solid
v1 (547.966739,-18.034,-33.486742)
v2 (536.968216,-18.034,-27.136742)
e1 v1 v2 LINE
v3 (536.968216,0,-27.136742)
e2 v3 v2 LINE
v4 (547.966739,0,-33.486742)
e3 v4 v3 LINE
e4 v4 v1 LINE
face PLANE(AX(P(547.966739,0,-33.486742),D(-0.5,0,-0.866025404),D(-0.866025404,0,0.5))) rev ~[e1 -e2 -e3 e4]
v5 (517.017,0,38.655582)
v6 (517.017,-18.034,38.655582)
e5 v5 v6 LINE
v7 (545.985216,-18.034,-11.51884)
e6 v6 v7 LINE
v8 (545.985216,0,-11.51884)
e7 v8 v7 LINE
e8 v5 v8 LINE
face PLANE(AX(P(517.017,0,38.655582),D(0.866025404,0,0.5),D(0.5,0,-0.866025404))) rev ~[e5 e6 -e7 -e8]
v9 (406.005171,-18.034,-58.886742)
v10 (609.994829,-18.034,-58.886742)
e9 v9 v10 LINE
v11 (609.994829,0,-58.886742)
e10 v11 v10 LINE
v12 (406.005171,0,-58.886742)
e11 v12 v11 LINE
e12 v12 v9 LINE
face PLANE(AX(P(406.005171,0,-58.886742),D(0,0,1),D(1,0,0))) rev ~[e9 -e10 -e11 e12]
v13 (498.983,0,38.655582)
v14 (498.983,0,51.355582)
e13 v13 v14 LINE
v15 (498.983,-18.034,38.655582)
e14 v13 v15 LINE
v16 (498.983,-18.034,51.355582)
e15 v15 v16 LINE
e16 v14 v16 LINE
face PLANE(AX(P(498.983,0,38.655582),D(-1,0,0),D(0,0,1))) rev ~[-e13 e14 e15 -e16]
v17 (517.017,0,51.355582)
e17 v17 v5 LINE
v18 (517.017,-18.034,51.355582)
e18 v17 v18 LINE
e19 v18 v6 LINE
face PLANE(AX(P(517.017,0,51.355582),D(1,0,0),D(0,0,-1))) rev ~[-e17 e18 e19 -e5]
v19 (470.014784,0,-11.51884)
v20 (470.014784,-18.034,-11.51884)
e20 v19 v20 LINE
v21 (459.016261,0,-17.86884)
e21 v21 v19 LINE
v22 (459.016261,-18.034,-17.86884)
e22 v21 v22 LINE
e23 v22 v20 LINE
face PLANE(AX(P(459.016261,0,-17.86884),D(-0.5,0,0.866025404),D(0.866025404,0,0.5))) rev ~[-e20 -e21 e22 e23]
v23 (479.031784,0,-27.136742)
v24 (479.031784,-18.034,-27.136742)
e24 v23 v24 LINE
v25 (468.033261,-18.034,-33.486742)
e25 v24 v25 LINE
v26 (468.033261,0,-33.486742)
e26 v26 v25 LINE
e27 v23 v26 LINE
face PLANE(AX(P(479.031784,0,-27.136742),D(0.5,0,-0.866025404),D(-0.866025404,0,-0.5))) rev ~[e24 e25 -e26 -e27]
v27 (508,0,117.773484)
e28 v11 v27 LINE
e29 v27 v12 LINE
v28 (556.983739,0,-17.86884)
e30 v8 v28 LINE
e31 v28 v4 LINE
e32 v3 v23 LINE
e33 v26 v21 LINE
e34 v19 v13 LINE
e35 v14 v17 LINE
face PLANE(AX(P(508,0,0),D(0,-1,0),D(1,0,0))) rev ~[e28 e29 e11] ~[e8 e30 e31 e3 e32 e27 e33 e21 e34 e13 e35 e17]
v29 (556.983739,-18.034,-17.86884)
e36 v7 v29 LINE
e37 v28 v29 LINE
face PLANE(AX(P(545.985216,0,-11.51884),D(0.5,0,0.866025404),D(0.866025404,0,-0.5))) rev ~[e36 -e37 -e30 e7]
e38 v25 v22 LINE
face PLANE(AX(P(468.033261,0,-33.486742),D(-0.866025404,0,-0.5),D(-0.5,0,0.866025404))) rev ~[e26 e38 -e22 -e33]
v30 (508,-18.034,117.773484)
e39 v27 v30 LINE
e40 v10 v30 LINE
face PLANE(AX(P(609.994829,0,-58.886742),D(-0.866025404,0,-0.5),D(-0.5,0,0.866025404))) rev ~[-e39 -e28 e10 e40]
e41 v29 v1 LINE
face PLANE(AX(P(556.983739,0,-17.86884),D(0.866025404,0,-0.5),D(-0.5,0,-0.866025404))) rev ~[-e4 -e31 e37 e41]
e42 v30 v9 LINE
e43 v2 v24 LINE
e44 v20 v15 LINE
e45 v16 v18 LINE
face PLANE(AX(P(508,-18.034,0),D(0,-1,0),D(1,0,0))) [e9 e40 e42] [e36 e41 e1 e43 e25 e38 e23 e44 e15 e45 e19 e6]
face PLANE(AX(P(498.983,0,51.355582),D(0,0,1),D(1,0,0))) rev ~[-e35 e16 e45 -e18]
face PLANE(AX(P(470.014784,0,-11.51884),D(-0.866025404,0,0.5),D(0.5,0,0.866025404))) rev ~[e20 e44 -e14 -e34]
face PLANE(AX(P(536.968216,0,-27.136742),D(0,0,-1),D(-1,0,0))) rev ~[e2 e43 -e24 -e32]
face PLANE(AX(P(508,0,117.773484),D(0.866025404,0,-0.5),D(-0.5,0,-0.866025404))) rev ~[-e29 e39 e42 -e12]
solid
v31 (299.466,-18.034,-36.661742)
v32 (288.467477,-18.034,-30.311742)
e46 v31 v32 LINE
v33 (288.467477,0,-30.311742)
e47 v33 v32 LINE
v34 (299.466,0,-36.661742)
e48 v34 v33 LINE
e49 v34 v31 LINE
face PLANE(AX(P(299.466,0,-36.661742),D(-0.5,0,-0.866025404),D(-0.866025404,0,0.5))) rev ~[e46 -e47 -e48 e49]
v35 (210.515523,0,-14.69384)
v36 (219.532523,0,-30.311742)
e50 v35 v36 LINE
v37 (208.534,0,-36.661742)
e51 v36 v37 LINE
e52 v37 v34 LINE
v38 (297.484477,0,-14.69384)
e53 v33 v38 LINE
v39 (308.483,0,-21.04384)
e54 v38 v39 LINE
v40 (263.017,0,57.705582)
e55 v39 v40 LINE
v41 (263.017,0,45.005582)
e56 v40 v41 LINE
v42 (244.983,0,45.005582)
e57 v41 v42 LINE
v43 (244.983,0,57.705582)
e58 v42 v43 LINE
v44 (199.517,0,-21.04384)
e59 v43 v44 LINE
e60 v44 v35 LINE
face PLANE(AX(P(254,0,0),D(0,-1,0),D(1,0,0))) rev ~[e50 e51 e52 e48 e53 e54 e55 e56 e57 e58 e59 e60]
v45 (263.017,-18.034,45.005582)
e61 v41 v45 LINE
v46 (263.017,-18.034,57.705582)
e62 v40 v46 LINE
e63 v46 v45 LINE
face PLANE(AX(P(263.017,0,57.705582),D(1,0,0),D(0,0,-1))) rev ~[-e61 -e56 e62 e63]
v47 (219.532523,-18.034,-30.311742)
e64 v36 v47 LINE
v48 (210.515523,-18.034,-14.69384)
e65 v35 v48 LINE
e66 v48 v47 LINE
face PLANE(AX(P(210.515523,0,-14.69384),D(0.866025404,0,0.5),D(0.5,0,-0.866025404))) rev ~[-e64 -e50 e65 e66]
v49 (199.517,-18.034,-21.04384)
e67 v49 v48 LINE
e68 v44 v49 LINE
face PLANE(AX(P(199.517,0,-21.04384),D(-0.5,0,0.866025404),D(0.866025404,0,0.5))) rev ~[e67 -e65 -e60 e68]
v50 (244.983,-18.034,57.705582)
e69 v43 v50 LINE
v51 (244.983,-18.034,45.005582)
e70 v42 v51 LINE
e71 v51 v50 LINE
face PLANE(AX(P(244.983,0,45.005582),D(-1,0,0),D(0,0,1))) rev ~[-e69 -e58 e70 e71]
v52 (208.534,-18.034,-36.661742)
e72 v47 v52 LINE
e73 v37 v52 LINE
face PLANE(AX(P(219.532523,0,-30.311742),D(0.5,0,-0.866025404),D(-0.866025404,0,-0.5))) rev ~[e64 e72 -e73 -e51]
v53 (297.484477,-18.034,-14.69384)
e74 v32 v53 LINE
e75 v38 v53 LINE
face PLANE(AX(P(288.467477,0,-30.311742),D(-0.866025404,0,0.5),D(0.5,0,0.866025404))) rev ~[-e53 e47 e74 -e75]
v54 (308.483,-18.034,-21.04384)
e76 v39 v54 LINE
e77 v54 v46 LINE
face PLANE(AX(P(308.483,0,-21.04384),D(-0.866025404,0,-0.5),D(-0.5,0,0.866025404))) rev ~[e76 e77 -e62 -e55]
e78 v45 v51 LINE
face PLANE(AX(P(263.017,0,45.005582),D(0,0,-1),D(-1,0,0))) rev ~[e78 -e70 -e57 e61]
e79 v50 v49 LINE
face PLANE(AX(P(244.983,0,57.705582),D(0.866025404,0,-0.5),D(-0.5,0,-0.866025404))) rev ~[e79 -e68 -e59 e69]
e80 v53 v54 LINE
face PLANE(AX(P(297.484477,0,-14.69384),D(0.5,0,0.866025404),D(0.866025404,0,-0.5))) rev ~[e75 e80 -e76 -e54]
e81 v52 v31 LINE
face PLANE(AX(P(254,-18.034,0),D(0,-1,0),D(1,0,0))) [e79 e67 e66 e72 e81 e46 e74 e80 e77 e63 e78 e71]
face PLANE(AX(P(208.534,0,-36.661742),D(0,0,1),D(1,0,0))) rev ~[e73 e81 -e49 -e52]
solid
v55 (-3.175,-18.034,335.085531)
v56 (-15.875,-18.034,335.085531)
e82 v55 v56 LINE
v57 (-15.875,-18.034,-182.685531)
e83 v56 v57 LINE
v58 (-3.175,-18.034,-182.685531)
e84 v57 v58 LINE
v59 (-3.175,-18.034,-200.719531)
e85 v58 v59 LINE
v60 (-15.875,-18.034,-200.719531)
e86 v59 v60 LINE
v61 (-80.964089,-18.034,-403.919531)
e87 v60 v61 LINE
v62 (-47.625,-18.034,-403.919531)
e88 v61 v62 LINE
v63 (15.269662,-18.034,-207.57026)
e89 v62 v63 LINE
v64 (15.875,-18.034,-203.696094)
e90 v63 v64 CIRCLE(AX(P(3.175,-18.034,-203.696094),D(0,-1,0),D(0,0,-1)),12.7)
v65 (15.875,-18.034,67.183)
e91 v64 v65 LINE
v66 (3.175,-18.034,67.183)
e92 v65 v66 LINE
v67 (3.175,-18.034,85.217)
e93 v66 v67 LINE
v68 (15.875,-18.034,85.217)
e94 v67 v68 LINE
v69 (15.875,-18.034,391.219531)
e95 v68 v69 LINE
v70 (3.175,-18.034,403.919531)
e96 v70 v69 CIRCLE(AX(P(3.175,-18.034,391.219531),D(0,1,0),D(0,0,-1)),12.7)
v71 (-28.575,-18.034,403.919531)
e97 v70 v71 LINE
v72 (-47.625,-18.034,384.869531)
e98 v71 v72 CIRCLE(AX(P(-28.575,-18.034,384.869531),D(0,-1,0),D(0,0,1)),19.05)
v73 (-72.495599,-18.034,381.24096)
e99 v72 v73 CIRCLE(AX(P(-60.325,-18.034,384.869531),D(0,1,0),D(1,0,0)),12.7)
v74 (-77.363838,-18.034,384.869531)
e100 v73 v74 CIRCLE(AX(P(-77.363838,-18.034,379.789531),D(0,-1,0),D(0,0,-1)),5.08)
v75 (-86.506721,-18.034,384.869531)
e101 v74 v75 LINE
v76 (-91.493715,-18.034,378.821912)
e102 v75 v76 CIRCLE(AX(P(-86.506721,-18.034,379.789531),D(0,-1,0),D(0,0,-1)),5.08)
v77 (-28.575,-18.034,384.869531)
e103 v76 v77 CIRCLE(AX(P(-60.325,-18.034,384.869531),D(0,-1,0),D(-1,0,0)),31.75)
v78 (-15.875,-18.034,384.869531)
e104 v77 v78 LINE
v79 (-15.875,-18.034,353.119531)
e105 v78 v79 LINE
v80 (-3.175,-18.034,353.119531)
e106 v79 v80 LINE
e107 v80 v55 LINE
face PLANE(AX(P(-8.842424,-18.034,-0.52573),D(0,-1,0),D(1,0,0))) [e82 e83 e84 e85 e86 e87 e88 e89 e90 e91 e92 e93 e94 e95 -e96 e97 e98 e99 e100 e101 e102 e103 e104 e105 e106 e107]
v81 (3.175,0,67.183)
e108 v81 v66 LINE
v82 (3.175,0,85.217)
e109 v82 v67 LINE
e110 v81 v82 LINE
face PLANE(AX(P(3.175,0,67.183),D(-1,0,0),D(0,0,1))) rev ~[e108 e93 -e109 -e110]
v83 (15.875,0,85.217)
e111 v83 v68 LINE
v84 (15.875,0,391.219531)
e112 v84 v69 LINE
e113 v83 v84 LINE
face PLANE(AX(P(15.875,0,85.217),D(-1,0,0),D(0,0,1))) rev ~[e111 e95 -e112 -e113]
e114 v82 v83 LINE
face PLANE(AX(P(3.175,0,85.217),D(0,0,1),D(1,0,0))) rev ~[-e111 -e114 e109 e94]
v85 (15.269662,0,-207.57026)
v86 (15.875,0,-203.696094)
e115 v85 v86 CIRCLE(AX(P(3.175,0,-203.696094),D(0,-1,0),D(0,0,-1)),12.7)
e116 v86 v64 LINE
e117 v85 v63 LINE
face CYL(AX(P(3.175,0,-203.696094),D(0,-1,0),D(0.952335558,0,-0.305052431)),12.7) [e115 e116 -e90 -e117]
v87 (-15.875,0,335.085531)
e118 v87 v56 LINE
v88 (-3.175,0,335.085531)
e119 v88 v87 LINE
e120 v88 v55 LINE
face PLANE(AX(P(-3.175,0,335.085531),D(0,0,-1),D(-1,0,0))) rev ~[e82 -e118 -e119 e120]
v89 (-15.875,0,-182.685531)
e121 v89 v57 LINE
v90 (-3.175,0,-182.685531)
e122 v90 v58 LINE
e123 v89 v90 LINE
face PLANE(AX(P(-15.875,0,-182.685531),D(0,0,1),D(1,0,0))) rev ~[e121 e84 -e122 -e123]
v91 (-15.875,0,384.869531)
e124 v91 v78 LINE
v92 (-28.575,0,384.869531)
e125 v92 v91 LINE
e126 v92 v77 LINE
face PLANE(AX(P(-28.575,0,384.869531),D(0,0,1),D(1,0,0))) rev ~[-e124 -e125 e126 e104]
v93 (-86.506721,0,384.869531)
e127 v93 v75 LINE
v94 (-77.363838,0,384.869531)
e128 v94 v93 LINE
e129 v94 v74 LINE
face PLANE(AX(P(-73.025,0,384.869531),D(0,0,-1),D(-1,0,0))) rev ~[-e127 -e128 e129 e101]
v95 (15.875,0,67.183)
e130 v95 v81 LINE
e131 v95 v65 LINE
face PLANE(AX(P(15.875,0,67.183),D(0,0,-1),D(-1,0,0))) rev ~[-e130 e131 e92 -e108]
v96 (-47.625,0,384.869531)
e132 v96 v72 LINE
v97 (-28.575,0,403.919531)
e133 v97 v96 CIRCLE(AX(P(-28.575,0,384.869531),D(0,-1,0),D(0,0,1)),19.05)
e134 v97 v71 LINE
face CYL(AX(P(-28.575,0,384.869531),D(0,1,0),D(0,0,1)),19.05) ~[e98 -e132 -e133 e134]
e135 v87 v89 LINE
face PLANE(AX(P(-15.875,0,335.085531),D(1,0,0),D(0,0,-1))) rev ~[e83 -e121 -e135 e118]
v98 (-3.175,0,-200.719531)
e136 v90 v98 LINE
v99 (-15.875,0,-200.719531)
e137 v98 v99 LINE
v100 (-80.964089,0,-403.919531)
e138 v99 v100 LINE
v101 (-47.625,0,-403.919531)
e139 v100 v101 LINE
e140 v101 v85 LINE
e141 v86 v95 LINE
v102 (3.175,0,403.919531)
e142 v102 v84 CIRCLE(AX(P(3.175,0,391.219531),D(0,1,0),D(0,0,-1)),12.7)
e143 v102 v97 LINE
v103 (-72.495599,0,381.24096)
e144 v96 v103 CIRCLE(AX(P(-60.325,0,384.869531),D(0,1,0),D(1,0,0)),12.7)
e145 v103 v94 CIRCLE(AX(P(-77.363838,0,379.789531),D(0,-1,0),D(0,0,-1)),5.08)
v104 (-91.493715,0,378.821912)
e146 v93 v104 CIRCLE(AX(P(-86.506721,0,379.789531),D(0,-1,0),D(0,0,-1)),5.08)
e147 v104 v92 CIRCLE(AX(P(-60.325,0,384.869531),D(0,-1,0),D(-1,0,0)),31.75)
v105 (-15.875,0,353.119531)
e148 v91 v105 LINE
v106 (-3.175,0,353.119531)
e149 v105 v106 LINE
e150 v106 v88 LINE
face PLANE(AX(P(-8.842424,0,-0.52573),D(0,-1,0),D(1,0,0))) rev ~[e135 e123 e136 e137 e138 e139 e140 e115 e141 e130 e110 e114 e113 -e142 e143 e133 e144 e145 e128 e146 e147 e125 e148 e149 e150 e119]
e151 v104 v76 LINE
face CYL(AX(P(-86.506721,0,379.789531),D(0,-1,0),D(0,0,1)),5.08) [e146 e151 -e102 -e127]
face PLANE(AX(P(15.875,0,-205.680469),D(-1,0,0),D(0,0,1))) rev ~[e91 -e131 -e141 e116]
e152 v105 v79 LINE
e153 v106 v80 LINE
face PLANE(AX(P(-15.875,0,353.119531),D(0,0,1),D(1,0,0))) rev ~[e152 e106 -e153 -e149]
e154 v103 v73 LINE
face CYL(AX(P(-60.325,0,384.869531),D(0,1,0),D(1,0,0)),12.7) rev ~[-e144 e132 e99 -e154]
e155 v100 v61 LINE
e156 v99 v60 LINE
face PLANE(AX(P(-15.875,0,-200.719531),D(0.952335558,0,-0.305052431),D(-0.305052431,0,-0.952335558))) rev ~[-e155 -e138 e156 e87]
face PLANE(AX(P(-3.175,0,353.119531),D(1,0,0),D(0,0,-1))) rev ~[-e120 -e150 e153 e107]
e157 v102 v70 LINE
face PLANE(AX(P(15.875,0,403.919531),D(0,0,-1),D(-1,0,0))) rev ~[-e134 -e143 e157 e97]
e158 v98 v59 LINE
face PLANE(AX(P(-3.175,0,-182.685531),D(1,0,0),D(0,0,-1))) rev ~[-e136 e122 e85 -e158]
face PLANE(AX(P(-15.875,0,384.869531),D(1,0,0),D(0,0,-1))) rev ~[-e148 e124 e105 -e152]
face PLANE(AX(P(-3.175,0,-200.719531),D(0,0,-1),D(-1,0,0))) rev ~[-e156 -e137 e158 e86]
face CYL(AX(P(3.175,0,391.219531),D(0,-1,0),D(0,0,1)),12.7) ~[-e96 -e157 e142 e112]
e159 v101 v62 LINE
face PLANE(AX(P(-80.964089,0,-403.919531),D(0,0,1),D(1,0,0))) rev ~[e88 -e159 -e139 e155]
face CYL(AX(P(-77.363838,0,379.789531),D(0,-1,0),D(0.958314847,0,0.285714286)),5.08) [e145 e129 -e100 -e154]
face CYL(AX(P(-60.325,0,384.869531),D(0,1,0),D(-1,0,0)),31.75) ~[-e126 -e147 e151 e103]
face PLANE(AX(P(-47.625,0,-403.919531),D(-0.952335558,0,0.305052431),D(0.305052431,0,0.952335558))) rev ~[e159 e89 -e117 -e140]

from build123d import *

# Parameters (mm, degrees)
F1_W     = 12.7
F1_H     = 19.05
F2_DEPTH = 18.034
F3_R     = 12.7
F4_R     = 5.08


# Not quite as in the source:
# - a variable given as a bare number and used for a length is read in inches; the dataset says mm whatever the document's units were


with BuildPart() as f2:
    # F1 (on Front) → F2 (new body)
    with BuildSketch(Plane.XZ):
        Polygon((15.875, 403.91953125), (-15.875, 403.91953125), (-15.875, 384.86953125), (-15.875, 353.11953125), (-3.175, 353.11953125), (-3.175, 335.08553125), (-15.875, 335.08553125), (-15.875, -182.68553125), (-3.175, -182.68553125), (-3.175, -200.71953125), (-15.875, -200.71953125), (-80.9640890891, -403.91953125), (-47.625, -403.91953125), (15.875, -205.68046875), (15.875, 67.183), (3.175, 67.183), (3.175, 76.2), (3.175, 85.217), (15.875, 85.217), align=None)
        with BuildLine():
            ThreePointArc((-92.075, 384.86953125), (-60.325, 353.11953125), (-28.575, 384.86953125))
            Line((-28.575, 384.86953125), (-47.625, 384.86953125))
            ThreePointArc((-47.625, 384.86953125), (-60.325, 372.16953125), (-73.025, 384.86953125))
            Line((-73.025, 384.86953125), (-92.075, 384.86953125))
        make_face()
        with BuildLine():
            Line((-28.575, 384.86953125), (-28.575, 403.91953125))
            ThreePointArc((-28.575, 403.91953125), (-42.0453841816, 398.3399154316), (-47.625, 384.86953125))
            Line((-47.625, 384.86953125), (-28.575, 384.86953125))
        make_face()
        with Locations((-22.225, 394.39453125)):
            Rectangle(F1_W, F1_H)
    extrude(amount=F2_DEPTH)

    # F3
    f3_edges = [f2.edges().sort_by_distance(p)[0] for p in [
        (15.875, -9.017, -205.680469),
        (15.875, -9.017, 403.919531),
    ]]
    fillet(f3_edges, radius=F3_R)

    # F4
    f4_edges = [f2.edges().sort_by_distance(p)[0] for p in [
        (-73.025, -9.017, 384.869531),
        (-92.075, -9.017, 384.869531),
    ]]
    fillet(f4_edges, radius=F4_R)


with BuildPart() as f2b:
    # F1 (on Front) → F2, piece 2 (new body)
    with BuildSketch(Plane.XZ):
        Polygon((208.534, -36.6617420935), (299.466, -36.6617420935), (288.4674773719, -30.3117420935), (297.4844773719, -14.6938399617), (308.483, -21.0438399617), (263.017, 57.7055820552), (263.017, 45.0055820552), (244.983, 45.0055820552), (244.983, 57.7055820552), (199.517, -21.0438399617), (210.5155226281, -14.6938399617), (219.5325226281, -30.3117420935), align=None)
    extrude(amount=F2_DEPTH)


with BuildPart() as f2c:
    # F1 (on Front) → F2, piece 3 (new body)
    with BuildSketch(Plane.XZ):
        Polygon((406.0051708018, -58.8867420935), (609.9948291982, -58.8867420935), (508, 117.7734841871), align=None)
        Polygon((470.0147839421, -11.5188399617), (498.983, 38.6555820552), (498.983, 51.3555820552), (517.017, 51.3555820552), (517.017, 38.6555820552), (545.9852160579, -11.5188399617), (556.983738686, -17.8688399617), (547.966738686, -33.4867420935), (536.9682160579, -27.1367420935), (479.0317839421, -27.1367420935), (468.033261314, -33.4867420935), (459.016261314, -17.8688399617), align=None, mode=Mode.SUBTRACT)
    extrude(amount=F2_DEPTH)


solid = Compound([f2.part, f2b.part, f2c.part])
